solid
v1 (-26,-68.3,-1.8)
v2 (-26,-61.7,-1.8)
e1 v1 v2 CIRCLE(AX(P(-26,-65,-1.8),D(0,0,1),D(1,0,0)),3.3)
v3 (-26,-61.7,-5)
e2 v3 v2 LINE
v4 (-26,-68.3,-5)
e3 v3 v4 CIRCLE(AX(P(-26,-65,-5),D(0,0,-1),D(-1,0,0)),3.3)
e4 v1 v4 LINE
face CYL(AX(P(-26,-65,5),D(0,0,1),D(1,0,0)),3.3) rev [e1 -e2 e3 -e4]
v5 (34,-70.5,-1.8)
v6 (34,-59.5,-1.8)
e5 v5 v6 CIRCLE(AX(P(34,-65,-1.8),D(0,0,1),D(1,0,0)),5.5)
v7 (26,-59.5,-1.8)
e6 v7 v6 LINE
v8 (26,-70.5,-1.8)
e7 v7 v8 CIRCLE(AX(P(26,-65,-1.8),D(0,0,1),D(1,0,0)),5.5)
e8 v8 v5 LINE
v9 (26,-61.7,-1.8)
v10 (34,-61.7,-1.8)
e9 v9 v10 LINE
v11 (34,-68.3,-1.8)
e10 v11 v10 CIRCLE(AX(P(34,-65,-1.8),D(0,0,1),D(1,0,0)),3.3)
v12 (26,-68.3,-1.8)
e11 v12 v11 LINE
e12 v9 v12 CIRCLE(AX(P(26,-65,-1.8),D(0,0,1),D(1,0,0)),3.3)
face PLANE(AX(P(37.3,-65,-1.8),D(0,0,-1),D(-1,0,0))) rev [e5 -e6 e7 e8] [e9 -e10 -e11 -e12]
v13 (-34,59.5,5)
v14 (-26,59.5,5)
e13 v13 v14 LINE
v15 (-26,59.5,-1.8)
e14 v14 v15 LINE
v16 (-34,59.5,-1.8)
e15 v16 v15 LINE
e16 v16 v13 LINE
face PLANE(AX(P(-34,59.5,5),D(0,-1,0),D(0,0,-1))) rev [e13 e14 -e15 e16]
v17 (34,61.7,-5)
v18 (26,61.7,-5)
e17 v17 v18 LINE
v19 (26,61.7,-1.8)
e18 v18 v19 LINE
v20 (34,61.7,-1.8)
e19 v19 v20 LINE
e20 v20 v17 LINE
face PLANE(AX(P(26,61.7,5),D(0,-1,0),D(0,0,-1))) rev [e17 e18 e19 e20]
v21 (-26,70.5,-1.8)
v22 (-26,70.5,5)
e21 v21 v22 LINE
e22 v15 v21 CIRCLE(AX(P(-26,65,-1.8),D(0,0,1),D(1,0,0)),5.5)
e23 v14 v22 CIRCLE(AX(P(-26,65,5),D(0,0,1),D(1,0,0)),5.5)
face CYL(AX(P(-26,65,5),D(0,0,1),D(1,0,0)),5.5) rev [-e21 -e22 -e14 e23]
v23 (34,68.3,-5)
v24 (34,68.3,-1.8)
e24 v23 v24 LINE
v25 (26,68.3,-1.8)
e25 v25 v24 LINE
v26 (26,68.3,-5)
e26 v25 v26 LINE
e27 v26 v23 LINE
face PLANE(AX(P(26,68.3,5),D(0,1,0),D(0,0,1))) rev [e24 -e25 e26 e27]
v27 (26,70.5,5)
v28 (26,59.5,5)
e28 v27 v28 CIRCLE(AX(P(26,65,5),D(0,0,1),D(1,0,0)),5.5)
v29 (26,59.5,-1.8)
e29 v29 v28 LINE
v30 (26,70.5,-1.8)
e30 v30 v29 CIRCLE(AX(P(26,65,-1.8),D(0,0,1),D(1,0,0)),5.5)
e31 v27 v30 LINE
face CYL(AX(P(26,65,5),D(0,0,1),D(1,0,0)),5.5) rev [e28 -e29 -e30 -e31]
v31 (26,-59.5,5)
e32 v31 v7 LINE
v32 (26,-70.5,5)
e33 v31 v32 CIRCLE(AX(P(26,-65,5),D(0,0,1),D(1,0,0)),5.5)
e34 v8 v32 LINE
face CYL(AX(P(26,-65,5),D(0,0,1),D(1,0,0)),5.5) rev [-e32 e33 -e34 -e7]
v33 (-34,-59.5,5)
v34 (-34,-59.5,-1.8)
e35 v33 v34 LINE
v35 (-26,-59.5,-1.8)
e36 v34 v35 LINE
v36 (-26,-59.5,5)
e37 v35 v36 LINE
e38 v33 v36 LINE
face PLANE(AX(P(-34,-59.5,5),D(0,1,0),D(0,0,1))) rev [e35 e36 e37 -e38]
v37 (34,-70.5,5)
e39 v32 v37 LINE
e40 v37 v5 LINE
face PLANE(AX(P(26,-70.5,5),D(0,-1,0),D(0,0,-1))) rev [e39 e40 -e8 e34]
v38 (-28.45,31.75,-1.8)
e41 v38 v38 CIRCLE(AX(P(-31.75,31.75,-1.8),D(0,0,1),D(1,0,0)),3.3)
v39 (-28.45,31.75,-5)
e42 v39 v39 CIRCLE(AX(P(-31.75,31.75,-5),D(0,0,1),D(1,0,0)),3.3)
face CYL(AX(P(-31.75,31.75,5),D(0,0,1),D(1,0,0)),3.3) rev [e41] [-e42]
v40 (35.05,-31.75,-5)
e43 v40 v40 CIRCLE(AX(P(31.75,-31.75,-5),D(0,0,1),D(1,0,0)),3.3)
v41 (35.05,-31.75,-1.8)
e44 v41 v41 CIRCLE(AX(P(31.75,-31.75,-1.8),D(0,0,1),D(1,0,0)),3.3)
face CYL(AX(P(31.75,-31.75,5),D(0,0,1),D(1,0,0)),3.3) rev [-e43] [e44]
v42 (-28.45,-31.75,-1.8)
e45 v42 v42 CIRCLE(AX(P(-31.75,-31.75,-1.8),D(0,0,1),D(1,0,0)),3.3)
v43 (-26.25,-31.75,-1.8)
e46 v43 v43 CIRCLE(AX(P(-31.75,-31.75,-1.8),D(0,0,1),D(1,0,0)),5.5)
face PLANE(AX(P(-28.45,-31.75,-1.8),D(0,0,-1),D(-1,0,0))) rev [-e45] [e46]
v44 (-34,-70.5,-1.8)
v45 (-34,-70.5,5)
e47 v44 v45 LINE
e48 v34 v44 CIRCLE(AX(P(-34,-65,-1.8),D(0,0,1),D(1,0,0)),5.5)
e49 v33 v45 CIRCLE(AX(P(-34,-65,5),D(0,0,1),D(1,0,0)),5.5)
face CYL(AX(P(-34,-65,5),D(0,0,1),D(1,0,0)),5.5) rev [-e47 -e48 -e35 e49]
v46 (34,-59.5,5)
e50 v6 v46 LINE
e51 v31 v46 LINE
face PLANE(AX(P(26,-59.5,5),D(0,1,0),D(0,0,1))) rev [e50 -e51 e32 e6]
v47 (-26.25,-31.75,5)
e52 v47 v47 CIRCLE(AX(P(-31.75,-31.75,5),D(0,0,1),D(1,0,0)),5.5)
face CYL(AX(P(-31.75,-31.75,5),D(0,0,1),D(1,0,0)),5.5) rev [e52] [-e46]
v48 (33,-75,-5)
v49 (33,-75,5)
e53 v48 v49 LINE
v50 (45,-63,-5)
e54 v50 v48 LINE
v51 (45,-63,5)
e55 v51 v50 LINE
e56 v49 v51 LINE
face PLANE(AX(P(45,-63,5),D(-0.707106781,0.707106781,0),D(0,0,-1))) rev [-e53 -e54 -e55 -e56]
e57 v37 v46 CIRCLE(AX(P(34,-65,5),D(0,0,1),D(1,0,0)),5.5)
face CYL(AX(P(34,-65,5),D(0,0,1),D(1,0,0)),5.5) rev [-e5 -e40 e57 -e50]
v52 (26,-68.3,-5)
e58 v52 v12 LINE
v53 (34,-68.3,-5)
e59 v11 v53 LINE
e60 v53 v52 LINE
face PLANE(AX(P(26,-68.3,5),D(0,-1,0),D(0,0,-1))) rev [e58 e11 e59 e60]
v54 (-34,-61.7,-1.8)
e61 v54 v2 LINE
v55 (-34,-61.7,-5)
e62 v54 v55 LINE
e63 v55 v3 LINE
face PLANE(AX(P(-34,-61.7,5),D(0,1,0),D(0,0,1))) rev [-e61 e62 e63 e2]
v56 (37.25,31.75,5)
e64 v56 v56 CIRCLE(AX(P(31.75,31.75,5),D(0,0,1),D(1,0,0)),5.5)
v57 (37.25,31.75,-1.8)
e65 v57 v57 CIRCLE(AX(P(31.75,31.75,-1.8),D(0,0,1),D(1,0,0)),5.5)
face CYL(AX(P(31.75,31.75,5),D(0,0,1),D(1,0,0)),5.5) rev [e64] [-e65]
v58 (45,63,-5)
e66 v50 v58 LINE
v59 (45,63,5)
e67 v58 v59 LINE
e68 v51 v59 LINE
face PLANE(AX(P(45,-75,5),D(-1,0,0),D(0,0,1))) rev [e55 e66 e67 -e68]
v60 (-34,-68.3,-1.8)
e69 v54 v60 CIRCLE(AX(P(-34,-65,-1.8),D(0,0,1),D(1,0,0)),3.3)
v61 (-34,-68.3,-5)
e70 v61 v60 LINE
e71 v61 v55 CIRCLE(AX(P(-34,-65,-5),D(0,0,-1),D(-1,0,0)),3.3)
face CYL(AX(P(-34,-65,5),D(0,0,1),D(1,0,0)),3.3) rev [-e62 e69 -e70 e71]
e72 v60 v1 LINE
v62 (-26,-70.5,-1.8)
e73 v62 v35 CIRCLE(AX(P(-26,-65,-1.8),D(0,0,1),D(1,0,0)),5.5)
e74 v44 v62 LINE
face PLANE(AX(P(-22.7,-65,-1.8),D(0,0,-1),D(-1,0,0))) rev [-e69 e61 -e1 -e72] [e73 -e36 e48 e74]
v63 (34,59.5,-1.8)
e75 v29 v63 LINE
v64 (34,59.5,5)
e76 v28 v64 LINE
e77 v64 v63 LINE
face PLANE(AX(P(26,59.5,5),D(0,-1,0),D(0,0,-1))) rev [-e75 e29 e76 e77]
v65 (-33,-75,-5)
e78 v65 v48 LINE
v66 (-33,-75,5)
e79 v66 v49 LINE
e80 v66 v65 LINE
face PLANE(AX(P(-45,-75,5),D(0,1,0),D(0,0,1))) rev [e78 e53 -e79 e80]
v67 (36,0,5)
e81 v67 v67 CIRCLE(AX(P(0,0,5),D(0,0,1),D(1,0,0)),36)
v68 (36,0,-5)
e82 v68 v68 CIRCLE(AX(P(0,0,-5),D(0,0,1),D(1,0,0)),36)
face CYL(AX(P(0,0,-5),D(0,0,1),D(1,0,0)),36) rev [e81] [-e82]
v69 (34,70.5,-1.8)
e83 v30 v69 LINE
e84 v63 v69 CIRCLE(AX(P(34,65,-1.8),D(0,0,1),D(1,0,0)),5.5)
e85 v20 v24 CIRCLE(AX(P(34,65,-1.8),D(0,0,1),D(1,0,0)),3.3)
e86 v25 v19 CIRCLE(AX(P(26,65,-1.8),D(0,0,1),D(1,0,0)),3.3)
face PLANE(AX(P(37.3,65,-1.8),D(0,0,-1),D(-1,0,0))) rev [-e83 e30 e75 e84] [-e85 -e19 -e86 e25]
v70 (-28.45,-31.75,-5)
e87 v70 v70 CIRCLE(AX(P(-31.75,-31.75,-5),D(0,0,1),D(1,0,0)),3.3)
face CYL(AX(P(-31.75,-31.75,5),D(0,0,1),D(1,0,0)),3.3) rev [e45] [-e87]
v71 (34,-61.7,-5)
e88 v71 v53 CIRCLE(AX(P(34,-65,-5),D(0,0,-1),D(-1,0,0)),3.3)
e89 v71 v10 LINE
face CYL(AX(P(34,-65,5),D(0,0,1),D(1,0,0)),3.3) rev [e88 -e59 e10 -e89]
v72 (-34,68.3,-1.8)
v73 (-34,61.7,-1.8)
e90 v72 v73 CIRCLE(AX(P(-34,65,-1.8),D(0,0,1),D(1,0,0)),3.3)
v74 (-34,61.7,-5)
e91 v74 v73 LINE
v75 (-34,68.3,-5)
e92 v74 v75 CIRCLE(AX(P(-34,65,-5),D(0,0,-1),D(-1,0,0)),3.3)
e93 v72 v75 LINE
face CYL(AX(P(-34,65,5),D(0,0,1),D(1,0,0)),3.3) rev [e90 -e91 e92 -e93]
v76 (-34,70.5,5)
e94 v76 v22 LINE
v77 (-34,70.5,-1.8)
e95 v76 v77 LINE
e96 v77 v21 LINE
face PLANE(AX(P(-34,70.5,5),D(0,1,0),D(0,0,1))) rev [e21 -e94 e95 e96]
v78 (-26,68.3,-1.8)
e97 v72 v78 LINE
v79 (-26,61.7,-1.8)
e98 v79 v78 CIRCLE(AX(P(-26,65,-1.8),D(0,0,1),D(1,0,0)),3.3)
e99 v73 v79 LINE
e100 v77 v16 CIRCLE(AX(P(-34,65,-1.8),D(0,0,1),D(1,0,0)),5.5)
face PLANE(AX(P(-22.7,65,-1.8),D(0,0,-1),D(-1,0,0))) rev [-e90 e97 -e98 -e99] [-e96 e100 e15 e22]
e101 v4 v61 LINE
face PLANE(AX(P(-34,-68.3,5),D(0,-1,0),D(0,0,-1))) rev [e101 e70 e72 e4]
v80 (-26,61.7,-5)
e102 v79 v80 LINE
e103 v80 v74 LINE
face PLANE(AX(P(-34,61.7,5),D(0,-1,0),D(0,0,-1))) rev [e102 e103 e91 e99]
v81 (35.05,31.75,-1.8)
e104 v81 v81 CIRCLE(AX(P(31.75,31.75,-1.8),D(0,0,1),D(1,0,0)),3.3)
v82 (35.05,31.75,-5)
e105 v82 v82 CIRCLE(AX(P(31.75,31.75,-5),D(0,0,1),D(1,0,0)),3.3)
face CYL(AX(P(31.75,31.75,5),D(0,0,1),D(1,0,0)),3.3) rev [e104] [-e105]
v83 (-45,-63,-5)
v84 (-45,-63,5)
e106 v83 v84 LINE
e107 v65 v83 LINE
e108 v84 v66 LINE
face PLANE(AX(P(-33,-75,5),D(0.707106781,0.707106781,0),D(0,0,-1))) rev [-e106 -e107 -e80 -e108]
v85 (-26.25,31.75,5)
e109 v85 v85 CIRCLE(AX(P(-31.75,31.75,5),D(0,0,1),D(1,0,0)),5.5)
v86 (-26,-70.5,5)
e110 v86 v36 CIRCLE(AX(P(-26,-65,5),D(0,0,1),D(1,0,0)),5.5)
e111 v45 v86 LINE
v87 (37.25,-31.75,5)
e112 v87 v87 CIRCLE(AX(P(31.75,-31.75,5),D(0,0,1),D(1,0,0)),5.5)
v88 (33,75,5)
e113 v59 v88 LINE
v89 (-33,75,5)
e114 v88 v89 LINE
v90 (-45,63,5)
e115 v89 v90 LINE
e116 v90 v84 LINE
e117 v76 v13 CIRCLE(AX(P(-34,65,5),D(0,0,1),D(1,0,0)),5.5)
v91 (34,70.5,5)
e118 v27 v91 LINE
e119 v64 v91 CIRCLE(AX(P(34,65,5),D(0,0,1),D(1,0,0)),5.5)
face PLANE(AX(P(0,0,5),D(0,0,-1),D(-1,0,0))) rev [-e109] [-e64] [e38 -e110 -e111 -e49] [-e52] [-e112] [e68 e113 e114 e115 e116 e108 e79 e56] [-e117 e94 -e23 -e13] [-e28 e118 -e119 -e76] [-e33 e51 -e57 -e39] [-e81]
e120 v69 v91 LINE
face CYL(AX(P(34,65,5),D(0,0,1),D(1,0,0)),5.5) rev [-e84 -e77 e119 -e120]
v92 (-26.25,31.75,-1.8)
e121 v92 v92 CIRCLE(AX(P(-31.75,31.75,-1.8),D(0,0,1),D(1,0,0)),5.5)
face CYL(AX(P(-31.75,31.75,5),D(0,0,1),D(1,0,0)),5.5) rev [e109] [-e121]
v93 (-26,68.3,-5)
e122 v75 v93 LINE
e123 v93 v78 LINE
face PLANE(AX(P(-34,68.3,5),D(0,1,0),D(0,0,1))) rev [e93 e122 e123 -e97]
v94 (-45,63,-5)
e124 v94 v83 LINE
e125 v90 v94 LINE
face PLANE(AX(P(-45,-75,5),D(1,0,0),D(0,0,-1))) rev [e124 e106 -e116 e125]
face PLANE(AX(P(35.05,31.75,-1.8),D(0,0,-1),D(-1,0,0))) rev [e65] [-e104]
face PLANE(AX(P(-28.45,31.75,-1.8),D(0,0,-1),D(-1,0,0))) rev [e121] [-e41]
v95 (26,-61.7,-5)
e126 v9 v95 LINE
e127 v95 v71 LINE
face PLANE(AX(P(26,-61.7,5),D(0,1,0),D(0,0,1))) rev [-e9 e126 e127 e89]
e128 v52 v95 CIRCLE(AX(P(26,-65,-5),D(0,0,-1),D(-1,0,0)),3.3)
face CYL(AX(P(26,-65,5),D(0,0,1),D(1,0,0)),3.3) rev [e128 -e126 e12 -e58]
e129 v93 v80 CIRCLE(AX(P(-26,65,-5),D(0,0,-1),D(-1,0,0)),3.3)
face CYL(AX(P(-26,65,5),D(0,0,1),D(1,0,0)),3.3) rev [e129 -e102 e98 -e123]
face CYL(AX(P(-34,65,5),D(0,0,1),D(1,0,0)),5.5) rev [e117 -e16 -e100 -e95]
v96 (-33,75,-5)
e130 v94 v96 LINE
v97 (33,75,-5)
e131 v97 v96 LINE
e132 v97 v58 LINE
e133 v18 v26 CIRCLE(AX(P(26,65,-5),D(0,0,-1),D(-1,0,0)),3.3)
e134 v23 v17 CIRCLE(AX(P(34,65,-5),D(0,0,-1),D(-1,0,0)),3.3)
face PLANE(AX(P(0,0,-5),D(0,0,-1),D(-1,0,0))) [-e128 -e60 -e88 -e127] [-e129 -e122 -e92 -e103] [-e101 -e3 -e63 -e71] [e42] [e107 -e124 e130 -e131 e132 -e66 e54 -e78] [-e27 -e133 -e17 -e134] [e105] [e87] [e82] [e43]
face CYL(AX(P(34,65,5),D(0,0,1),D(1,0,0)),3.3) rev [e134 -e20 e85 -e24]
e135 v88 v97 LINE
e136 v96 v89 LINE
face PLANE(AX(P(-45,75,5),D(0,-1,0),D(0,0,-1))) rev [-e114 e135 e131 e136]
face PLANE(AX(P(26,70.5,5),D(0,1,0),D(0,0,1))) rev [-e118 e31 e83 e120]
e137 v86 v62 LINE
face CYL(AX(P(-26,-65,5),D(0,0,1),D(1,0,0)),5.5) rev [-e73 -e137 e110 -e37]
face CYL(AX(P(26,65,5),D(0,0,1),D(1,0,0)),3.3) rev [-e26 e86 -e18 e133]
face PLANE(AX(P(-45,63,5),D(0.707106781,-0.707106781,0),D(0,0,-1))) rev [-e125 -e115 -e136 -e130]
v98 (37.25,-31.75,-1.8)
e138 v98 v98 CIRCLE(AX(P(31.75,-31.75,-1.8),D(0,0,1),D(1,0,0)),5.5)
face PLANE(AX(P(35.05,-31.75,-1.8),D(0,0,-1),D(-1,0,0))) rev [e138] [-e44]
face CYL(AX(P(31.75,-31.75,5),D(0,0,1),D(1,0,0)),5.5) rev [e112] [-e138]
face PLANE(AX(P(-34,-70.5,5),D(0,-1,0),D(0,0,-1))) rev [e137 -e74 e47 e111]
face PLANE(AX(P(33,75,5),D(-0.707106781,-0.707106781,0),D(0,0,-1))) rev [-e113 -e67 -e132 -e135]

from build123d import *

# Parameters (mm, degrees)
SKETCH_1_W                = 90
SKETCH_1_H                = 150
EXTRUDE_1_DEPTH           = 5
SKETCH_4_R                = 36
CUT_EXTRUDE_1_DEPTH       = 89.034084308
HOLE_WIZARD_3_D           = 6.6
HOLE_WIZARD_3_CBORE_D     = 11
HOLE_WIZARD_3_CBORE_DEPTH = 6.8
HOLE_START                = -1.8
HOLE_WIZARD_2_DEPTH       = 6.8
HOLE_START_2              = -5
HOLE_WIZARD_2_2_DEPTH     = 3.2
CHAMFER_1_SIZE            = 12


# Read off the part's stored shape, not the designer's step: 打孔尺寸(%根据)内六角圆柱头螺钉的类型2
with BuildPart() as part:
    # 草图1 → 凸台-拉伸1 (new, symmetric)
    with BuildSketch(Plane.XY):
        Rectangle(SKETCH_1_W, SKETCH_1_H)
    extrude(amount=EXTRUDE_1_DEPTH, both=True)

    # 草图4 → 切除-拉伸1 (cut, through all)
    with BuildSketch(Plane.XY.offset(5)):
        Circle(SKETCH_4_R)
    extrude(amount=-CUT_EXTRUDE_1_DEPTH, mode=Mode.SUBTRACT)

    # 打孔尺寸(%根据)内六角圆柱头螺钉的类型3 (through all)
    with Locations(Plane(origin=(-31.75, 31.75, 5), x_dir=(1, 0, 0), z_dir=(0, 0, 1))):
        with Locations((0, 0), (63.5, 0), (0, -63.5), (63.5, -63.5)):
            CounterBoreHole(HOLE_WIZARD_3_D / 2, HOLE_WIZARD_3_CBORE_D / 2, HOLE_WIZARD_3_CBORE_DEPTH)

    # 打孔尺寸(%根据)内六角圆柱头螺钉的类型2 outline → 打孔尺寸(%根据)内六角圆柱头螺钉的类型2 (cut)
    with BuildSketch(Plane.XY.offset(HOLE_START)):
        with BuildLine():
            Line((-34, 59.5), (-26, 59.5))
            ThreePointArc((-26, 59.5), (-20.5, 65), (-26, 70.5))
            Line((-26, 70.5), (-34, 70.5))
            ThreePointArc((-34, 70.5), (-39.5, 65), (-34, 59.5))
        make_face()
        with BuildLine():
            ThreePointArc((34, 59.5), (39.5, 65), (34, 70.5))
            Line((34, 70.5), (26, 70.5))
            ThreePointArc((26, 70.5), (20.5, 65), (26, 59.5))
            Line((26, 59.5), (34, 59.5))
        make_face()
        with BuildLine():
            Line((-34, -70.5), (-26, -70.5))
            ThreePointArc((-26, -70.5), (-20.5, -65), (-26, -59.5))
            Line((-26, -59.5), (-34, -59.5))
            ThreePointArc((-34, -59.5), (-39.5, -65), (-34, -70.5))
        make_face()
        with BuildLine():
            ThreePointArc((34, -70.5), (39.5, -65), (34, -59.5))
            Line((34, -59.5), (26, -59.5))
            ThreePointArc((26, -59.5), (20.5, -65), (26, -70.5))
            Line((26, -70.5), (34, -70.5))
        make_face()
    extrude(amount=HOLE_WIZARD_2_DEPTH, mode=Mode.SUBTRACT)

    # Hole Wizard 2 2 outline → Hole Wizard 2 2 (cut)
    with BuildSketch(Plane.XY.offset(HOLE_START_2)):
        with BuildLine():
            Line((-34, 61.7), (-26, 61.7))
            ThreePointArc((-26, 61.7), (-22.7, 65), (-26, 68.3))
            Line((-26, 68.3), (-34, 68.3))
            ThreePointArc((-34, 68.3), (-37.3, 65), (-34, 61.7))
        make_face()
        with BuildLine():
            ThreePointArc((34, 61.7), (37.3, 65), (34, 68.3))
            Line((34, 68.3), (26, 68.3))
            ThreePointArc((26, 68.3), (22.7, 65), (26, 61.7))
            Line((26, 61.7), (34, 61.7))
        make_face()
        with BuildLine():
            Line((-34, -68.3), (-26, -68.3))
            ThreePointArc((-26, -68.3), (-22.7, -65), (-26, -61.7))
            Line((-26, -61.7), (-34, -61.7))
            ThreePointArc((-34, -61.7), (-37.3, -65), (-34, -68.3))
        make_face()
        with BuildLine():
            ThreePointArc((34, -68.3), (37.3, -65), (34, -61.7))
            Line((34, -61.7), (26, -61.7))
            ThreePointArc((26, -61.7), (22.7, -65), (26, -68.3))
            Line((26, -68.3), (34, -68.3))
        make_face()
    extrude(amount=HOLE_WIZARD_2_2_DEPTH, mode=Mode.SUBTRACT)

    # 倒角1
    chamfer_1_edges = [part.edges().sort_by_distance(p)[0] for p in [
        (45, -75, 0),
        (-45, -75, 0),
        (-45, 75, 0),
        (45, 75, 0),
    ]]
    chamfer(chamfer_1_edges, length=CHAMFER_1_SIZE)


solid = part.part
